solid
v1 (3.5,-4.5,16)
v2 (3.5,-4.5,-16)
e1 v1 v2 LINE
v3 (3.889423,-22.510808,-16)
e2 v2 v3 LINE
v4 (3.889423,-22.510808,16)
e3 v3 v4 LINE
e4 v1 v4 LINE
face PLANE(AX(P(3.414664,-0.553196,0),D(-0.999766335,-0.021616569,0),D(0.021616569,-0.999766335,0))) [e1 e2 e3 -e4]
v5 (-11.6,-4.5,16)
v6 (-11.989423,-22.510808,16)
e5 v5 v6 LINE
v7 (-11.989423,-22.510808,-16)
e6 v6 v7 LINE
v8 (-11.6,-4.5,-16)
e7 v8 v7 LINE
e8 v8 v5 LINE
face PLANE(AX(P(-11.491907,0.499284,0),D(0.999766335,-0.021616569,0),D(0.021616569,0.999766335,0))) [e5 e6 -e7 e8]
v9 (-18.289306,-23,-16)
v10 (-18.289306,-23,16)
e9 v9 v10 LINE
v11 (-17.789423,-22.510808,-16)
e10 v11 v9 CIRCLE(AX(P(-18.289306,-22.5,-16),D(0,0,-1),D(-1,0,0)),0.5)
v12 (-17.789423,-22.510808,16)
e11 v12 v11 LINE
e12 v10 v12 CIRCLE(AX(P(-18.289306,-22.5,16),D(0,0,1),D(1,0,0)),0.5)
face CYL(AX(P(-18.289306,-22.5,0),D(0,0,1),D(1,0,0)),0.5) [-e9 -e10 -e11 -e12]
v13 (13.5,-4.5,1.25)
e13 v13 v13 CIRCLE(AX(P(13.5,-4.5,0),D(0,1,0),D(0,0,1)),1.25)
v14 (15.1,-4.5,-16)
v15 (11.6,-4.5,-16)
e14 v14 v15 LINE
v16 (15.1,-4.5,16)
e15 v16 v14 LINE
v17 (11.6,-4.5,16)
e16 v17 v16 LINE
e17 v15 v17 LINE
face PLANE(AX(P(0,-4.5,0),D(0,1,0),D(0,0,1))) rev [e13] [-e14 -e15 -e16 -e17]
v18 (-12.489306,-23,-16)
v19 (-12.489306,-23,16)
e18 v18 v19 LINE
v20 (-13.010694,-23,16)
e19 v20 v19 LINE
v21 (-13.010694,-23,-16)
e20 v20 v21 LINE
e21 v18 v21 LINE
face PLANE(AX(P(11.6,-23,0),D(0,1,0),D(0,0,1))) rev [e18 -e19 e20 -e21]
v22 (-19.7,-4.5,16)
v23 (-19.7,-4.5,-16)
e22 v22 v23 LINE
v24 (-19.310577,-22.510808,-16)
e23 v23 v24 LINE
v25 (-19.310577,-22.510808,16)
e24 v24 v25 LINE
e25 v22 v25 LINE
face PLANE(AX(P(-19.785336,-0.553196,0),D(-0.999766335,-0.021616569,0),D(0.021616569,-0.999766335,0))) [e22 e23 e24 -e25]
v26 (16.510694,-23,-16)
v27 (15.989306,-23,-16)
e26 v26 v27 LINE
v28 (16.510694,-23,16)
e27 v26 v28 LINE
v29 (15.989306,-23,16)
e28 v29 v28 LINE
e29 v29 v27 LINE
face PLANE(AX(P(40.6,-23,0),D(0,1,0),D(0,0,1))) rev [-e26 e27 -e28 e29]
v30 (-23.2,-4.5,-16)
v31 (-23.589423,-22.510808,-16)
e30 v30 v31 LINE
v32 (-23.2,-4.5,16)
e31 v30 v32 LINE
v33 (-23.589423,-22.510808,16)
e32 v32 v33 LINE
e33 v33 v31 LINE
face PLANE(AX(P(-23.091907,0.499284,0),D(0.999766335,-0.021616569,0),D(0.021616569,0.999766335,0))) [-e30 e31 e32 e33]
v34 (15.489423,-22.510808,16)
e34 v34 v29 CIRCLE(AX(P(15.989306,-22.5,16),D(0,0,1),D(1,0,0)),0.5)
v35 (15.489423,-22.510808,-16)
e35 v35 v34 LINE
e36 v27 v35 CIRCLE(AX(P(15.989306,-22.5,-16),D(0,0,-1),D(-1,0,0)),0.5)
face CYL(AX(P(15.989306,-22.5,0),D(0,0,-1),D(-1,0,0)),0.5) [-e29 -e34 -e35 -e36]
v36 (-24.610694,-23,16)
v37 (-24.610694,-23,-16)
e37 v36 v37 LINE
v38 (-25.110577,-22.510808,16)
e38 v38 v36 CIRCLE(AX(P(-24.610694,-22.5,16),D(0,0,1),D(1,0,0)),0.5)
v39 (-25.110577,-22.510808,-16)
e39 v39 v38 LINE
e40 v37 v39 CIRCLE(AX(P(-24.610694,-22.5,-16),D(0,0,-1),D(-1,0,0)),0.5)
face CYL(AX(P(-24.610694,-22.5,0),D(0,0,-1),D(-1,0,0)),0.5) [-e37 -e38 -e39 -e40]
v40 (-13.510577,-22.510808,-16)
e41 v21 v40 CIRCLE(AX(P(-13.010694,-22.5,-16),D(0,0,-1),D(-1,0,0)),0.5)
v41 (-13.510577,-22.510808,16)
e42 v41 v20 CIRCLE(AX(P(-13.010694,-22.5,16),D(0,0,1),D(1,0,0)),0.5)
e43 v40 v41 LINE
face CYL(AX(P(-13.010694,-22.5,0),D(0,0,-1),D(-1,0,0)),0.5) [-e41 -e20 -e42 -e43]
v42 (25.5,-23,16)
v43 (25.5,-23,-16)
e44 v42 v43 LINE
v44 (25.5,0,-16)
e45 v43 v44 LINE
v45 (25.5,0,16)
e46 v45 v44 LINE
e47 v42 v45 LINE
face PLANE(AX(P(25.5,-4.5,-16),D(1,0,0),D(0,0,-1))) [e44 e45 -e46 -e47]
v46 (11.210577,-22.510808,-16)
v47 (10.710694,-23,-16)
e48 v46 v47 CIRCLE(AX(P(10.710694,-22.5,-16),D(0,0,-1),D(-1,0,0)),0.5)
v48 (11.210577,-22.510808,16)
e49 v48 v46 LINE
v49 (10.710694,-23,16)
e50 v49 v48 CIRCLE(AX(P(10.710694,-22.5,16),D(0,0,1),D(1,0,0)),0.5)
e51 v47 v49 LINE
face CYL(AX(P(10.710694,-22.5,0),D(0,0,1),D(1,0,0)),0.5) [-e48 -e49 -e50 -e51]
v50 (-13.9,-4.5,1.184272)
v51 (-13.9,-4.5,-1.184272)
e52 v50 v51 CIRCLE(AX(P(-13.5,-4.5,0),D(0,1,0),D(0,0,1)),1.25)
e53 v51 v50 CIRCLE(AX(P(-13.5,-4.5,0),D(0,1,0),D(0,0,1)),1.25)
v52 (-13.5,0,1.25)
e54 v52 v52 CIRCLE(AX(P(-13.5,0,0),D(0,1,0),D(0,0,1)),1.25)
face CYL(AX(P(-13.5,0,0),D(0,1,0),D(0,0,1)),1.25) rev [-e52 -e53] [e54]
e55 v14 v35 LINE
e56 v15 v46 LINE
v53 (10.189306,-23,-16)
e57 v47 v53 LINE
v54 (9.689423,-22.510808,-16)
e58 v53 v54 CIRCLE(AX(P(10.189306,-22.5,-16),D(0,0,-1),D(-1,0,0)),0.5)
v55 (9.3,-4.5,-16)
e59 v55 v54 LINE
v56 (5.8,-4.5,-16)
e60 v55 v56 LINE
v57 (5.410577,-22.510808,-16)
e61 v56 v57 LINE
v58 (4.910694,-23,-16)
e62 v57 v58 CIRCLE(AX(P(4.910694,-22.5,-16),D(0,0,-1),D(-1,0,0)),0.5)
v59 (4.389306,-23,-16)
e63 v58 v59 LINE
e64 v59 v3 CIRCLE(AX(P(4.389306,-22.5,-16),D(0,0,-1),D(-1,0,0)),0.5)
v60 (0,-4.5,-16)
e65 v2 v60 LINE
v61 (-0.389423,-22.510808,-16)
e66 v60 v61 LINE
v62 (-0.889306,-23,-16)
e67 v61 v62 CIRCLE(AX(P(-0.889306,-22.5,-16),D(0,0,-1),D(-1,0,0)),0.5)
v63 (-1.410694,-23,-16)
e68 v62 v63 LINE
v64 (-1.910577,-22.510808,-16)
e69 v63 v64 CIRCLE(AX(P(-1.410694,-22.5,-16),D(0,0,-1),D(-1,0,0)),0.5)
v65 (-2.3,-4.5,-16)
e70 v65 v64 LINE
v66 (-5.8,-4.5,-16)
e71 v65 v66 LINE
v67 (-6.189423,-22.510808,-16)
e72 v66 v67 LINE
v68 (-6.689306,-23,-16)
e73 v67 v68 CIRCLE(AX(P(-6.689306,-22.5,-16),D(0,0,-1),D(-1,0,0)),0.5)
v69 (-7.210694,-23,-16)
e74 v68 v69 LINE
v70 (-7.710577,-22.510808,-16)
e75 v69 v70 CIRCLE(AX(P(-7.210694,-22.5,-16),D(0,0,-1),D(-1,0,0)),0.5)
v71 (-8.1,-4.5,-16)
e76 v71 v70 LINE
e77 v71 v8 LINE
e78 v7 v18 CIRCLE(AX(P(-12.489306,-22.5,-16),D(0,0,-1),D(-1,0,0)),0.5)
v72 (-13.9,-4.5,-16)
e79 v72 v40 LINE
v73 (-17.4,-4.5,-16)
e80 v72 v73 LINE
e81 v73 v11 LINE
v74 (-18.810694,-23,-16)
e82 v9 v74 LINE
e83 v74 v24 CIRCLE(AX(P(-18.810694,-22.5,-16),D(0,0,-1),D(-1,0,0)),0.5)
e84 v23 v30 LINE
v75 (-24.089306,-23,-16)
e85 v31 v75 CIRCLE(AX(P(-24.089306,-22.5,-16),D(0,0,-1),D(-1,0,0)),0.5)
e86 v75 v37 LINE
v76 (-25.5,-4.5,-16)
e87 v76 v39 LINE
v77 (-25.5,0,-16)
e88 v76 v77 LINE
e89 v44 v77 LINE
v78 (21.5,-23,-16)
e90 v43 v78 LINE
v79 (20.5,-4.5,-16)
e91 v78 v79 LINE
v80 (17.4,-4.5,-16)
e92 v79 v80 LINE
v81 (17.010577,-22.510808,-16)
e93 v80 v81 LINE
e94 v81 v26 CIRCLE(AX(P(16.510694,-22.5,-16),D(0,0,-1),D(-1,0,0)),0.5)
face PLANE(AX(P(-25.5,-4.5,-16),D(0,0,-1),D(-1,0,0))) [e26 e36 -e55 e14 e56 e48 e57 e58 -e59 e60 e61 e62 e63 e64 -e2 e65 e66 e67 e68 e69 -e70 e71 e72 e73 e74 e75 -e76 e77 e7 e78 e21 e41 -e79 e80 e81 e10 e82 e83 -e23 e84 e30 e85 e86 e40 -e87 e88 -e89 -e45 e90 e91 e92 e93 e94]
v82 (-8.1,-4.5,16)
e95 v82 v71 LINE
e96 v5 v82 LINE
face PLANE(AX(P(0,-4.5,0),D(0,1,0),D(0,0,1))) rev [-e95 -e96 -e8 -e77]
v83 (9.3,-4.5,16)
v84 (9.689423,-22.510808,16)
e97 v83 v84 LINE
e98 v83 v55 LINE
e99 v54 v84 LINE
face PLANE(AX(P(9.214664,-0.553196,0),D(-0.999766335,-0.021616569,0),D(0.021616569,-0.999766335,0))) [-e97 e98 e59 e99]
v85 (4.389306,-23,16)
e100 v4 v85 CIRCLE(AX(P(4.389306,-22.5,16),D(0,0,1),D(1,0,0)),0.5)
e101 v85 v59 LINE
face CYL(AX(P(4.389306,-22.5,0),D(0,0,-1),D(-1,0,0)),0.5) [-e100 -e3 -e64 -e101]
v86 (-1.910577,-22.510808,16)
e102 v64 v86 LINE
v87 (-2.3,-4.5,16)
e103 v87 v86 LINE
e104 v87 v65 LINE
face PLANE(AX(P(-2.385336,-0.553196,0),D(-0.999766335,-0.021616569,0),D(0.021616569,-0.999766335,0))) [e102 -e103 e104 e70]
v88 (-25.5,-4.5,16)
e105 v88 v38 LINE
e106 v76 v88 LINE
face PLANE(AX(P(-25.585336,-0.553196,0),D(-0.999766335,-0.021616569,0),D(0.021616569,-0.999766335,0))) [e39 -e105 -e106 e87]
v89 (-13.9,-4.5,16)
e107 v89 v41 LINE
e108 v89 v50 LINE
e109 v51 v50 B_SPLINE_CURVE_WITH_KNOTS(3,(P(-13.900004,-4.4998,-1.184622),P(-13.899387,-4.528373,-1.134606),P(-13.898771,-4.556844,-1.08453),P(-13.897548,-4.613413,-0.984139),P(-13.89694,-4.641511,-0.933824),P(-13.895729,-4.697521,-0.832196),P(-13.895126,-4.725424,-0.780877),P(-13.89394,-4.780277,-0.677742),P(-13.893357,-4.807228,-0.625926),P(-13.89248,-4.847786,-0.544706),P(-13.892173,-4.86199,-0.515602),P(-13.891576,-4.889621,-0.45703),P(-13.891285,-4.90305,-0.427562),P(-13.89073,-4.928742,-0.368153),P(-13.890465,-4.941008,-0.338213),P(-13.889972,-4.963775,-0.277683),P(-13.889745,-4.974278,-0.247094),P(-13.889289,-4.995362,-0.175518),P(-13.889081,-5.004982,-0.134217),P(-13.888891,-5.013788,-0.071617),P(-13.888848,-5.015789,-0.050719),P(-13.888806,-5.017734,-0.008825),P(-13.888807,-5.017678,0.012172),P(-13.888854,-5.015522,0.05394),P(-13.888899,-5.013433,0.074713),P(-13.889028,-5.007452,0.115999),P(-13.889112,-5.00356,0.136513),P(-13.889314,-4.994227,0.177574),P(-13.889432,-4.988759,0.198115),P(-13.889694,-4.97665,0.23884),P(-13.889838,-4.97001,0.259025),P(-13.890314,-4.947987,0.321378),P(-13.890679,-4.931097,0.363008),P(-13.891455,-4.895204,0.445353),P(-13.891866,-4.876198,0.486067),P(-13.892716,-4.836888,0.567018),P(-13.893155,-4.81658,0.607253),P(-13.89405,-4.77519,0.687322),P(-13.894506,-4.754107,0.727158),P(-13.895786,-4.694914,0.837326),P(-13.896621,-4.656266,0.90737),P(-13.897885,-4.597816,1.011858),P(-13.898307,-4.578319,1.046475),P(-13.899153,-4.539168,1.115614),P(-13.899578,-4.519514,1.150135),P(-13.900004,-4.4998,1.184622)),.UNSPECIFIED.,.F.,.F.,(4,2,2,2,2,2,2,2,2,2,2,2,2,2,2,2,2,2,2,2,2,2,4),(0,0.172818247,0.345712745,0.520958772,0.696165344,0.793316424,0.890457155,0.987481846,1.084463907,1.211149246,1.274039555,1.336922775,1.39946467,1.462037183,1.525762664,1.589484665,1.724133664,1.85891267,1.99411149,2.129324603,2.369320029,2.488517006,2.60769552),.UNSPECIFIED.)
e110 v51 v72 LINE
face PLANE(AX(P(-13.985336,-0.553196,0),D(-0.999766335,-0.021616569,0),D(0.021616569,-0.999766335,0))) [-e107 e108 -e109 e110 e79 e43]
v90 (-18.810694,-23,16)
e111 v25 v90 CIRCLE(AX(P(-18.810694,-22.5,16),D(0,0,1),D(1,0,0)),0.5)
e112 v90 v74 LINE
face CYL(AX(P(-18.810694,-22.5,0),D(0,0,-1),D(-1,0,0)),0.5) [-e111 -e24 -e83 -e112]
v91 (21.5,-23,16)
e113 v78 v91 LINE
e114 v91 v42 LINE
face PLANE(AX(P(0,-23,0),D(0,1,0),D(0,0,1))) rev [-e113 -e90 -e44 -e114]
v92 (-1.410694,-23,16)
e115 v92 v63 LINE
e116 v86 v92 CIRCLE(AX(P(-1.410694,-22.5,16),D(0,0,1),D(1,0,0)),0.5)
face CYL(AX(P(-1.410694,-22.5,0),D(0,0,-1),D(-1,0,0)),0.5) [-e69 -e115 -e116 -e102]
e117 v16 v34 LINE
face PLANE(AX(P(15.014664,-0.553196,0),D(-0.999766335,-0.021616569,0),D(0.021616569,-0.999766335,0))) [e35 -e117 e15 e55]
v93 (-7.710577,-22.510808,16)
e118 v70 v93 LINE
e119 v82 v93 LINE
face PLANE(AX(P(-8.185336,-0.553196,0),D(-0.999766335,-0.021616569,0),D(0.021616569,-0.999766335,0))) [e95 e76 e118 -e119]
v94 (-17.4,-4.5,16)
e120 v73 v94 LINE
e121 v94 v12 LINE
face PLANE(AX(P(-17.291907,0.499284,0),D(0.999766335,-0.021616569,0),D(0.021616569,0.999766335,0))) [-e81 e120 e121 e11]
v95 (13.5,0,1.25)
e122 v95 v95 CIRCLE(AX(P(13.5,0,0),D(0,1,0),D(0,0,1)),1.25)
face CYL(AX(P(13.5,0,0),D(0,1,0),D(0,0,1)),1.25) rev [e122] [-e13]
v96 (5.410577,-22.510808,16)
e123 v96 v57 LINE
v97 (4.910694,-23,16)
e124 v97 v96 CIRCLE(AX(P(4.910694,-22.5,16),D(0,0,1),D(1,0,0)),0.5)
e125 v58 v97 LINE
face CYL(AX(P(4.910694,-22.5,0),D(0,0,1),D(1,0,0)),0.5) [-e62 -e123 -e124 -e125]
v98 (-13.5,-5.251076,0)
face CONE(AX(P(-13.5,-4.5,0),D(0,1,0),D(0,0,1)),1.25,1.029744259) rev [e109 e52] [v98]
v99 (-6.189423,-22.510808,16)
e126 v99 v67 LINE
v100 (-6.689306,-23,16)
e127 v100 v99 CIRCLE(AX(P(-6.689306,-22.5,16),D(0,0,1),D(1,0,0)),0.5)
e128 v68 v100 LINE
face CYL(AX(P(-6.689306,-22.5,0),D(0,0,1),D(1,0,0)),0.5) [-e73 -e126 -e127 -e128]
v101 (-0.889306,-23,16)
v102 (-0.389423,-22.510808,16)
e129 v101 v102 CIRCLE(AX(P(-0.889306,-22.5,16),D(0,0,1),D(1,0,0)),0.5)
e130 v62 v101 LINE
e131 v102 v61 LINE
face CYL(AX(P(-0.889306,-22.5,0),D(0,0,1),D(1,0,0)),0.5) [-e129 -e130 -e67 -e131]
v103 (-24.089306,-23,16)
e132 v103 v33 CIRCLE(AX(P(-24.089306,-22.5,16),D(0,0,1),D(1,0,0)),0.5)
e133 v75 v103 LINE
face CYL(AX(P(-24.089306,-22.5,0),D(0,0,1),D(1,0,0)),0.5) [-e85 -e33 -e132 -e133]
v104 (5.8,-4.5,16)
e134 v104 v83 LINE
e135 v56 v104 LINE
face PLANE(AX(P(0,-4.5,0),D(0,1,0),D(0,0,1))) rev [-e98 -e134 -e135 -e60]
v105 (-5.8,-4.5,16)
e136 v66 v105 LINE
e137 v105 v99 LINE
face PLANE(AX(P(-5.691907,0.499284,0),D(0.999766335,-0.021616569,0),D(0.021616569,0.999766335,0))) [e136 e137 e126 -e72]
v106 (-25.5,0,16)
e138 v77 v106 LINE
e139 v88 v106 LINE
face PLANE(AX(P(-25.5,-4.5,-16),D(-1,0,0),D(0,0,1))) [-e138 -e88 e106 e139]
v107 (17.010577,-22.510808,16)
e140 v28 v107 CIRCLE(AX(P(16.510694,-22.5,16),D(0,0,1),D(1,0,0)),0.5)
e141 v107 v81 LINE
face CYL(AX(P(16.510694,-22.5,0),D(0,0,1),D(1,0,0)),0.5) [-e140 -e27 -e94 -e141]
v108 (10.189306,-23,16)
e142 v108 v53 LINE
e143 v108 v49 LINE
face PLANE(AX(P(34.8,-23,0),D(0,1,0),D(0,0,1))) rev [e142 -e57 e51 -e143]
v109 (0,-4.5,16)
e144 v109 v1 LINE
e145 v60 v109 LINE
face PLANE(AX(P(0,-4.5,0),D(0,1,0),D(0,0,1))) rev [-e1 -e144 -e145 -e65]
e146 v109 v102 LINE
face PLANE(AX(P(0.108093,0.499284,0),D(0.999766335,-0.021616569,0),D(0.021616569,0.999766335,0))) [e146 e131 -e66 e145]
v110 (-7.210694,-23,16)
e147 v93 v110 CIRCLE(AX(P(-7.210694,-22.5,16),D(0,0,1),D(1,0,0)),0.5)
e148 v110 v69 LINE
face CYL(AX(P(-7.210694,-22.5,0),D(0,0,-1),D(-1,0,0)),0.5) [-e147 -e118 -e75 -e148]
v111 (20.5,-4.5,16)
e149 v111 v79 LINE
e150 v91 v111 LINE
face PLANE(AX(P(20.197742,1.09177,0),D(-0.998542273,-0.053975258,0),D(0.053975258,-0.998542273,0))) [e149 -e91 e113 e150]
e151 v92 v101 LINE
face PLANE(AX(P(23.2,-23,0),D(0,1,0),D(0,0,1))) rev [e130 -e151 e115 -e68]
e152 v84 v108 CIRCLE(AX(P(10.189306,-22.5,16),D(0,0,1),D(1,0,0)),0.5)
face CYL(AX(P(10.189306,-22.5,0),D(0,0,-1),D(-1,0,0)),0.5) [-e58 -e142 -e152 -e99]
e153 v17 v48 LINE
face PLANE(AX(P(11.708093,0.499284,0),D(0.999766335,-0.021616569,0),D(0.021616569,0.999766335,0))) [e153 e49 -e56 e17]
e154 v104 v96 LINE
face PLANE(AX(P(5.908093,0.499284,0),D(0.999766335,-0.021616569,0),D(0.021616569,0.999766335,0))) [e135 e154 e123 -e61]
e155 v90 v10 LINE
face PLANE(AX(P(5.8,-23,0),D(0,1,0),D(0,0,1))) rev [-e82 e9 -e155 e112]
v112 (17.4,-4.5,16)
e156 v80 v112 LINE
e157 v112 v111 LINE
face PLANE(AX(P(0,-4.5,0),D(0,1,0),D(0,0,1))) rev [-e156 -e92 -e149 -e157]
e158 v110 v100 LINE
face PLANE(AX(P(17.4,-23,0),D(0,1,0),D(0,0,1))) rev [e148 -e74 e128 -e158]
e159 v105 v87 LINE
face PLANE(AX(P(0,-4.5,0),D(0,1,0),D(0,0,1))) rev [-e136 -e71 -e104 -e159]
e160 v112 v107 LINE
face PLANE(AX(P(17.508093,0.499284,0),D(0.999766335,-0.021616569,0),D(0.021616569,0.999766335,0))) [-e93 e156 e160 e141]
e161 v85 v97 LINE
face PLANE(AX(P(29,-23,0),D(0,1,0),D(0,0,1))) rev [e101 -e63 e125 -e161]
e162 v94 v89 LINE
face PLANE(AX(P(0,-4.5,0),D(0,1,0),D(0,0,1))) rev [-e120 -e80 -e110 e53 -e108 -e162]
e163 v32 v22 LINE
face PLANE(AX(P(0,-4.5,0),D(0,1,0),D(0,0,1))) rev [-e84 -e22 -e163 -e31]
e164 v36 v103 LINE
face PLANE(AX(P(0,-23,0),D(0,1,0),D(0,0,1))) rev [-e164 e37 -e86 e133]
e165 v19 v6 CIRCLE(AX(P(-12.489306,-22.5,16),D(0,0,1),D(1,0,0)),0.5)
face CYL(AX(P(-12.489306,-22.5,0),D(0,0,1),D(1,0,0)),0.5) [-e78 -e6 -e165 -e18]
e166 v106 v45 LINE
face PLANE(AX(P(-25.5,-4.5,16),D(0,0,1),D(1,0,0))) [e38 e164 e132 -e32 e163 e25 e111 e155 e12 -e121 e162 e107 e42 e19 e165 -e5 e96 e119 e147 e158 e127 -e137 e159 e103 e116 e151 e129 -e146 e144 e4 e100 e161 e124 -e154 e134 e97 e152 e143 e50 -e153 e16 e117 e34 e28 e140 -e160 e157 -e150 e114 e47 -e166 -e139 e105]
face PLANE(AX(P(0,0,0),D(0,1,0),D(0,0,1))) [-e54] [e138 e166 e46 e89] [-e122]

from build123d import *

# Parameters (mm, degrees)
SKETCH1_W              = 51
SKETCH1_H              = 32
BOSS_EXTRUDE1_DEPTH    = 4.5
FILLET1_R              = 0.5
LPATTERN1_COUNT        = 8
LPATTERN1_PITCH        = 5.8
FILLET1_OF_LPATTERN1_R = 0.5
M3X0_5_TAPPED_HOLE1_D  = 2.5


# Read off the part's stored shape, not the designer's step: Mirror1
with BuildPart() as part:
    # Sketch1 → Boss-Extrude1 (new body)
    with BuildSketch(Plane(origin=(0, 0, 0), x_dir=(1, 0, 0), z_dir=(0, 1, 0))):
        Rectangle(SKETCH1_W, SKETCH1_H)
    extrude(amount=-BOSS_EXTRUDE1_DEPTH)

    # Sketch2 → Loft1 section 0
    with BuildSketch(Plane(origin=(0, -4.5, 0), x_dir=(-1, 0, 0), z_dir=(0, -1, 0))):
        with BuildLine():
            Line((25.5, -16), (23.2, -16))
            Line((23.2, -16), (23.2, 16))
            Line((23.2, 16), (25.5, 16))
            Line((25.5, 16), (25.5, -16))
        make_face()
    # Sketch3 → Loft1 section 1
    with BuildSketch(Plane(origin=(0, -23, 0), x_dir=(1, 0, 0), z_dir=(0, 1, 0))):
        with BuildLine():
            Line((-23.6, -16), (-25.1, -16))
            Line((-25.1, -16), (-25.1, 16))
            Line((-25.1, 16), (-23.6, 16))
            Line((-23.6, 16), (-23.6, -16))
        make_face()
    loft1 = loft()

    # Fillet1
    fillet1_edges = [part.edges().sort_by_distance(p)[0] for p in [
        (-25.1, -23, 0),
        (-23.6, -23, 0),
    ]]
    fillet(fillet1_edges, radius=FILLET1_R)

    # LPattern1: Loft1 ×8
    with Locations(*[(i * LPATTERN1_PITCH, 0, 0) for i in range(1, LPATTERN1_COUNT)]):
        add(loft1)

    # Fillet1 of LPattern1
    fillet1_of_lpattern1_edges = [part.edges().sort_by_distance(p)[0] for p in [
        (-19.3, -23, 0),
        (-17.8, -23, 0),
        (-13.5, -23, 0),
        (-12, -23, 0),
        (-7.7, -23, 0),
        (-6.2, -23, 0),
        (-1.9, -23, 0),
        (-0.4, -23, 0),
        (3.9, -23, 0),
        (5.4, -23, 0),
        (9.7, -23, 0),
        (11.2, -23, 0),
        (15.5, -23, 0),
        (17, -23, 0),
    ]]
    fillet(fillet1_of_lpattern1_edges, radius=FILLET1_OF_LPATTERN1_R)

    # Sketch5 → Loft2 section 0
    with BuildSketch(Plane(origin=(0, -23, 0), x_dir=(1, 0, 0), z_dir=(0, 1, 0))):
        with BuildLine():
            Line((25.5, -16), (21.5, -16))
            Line((21.5, -16), (21.5, 16))
            Line((21.5, 16), (25.5, 16))
            Line((25.5, 16), (25.5, -16))
        make_face()
    # Sketch4 → Loft2 section 1
    with BuildSketch(Plane(origin=(0, -4.5, 0), x_dir=(-1, 0, 0), z_dir=(0, -1, 0))):
        with BuildLine():
            Line((-25.5, -16), (-20.5, -16))
            Line((-20.5, -16), (-20.5, 16))
            Line((-20.5, 16), (-25.5, 16))
            Line((-25.5, 16), (-25.5, -16))
        make_face()
    loft()

    # M3x0.5 Tapped Hole1 (through all)
    with Locations(Plane(origin=(0, 0, 0), x_dir=(1, 0, 0), z_dir=(0, 1, 0))):
        with Locations((13.5, 0)):
            Hole(M3X0_5_TAPPED_HOLE1_D / 2)

    # Mirror1 outline → Mirror1 (revolve, cut)
    with BuildSketch(Plane(origin=(-13.5, 0, 0), x_dir=(1, 0, 0), z_dir=(0, 0, 1))):
        Polygon((0, 0), (0, -5.251075774), (1.250000005, -4.499999997), (1.25, 0), align=None)
    revolve(axis=Axis((-13.5, 0, 0), (0, 1, 0)), mode=Mode.SUBTRACT)


solid = part.part
